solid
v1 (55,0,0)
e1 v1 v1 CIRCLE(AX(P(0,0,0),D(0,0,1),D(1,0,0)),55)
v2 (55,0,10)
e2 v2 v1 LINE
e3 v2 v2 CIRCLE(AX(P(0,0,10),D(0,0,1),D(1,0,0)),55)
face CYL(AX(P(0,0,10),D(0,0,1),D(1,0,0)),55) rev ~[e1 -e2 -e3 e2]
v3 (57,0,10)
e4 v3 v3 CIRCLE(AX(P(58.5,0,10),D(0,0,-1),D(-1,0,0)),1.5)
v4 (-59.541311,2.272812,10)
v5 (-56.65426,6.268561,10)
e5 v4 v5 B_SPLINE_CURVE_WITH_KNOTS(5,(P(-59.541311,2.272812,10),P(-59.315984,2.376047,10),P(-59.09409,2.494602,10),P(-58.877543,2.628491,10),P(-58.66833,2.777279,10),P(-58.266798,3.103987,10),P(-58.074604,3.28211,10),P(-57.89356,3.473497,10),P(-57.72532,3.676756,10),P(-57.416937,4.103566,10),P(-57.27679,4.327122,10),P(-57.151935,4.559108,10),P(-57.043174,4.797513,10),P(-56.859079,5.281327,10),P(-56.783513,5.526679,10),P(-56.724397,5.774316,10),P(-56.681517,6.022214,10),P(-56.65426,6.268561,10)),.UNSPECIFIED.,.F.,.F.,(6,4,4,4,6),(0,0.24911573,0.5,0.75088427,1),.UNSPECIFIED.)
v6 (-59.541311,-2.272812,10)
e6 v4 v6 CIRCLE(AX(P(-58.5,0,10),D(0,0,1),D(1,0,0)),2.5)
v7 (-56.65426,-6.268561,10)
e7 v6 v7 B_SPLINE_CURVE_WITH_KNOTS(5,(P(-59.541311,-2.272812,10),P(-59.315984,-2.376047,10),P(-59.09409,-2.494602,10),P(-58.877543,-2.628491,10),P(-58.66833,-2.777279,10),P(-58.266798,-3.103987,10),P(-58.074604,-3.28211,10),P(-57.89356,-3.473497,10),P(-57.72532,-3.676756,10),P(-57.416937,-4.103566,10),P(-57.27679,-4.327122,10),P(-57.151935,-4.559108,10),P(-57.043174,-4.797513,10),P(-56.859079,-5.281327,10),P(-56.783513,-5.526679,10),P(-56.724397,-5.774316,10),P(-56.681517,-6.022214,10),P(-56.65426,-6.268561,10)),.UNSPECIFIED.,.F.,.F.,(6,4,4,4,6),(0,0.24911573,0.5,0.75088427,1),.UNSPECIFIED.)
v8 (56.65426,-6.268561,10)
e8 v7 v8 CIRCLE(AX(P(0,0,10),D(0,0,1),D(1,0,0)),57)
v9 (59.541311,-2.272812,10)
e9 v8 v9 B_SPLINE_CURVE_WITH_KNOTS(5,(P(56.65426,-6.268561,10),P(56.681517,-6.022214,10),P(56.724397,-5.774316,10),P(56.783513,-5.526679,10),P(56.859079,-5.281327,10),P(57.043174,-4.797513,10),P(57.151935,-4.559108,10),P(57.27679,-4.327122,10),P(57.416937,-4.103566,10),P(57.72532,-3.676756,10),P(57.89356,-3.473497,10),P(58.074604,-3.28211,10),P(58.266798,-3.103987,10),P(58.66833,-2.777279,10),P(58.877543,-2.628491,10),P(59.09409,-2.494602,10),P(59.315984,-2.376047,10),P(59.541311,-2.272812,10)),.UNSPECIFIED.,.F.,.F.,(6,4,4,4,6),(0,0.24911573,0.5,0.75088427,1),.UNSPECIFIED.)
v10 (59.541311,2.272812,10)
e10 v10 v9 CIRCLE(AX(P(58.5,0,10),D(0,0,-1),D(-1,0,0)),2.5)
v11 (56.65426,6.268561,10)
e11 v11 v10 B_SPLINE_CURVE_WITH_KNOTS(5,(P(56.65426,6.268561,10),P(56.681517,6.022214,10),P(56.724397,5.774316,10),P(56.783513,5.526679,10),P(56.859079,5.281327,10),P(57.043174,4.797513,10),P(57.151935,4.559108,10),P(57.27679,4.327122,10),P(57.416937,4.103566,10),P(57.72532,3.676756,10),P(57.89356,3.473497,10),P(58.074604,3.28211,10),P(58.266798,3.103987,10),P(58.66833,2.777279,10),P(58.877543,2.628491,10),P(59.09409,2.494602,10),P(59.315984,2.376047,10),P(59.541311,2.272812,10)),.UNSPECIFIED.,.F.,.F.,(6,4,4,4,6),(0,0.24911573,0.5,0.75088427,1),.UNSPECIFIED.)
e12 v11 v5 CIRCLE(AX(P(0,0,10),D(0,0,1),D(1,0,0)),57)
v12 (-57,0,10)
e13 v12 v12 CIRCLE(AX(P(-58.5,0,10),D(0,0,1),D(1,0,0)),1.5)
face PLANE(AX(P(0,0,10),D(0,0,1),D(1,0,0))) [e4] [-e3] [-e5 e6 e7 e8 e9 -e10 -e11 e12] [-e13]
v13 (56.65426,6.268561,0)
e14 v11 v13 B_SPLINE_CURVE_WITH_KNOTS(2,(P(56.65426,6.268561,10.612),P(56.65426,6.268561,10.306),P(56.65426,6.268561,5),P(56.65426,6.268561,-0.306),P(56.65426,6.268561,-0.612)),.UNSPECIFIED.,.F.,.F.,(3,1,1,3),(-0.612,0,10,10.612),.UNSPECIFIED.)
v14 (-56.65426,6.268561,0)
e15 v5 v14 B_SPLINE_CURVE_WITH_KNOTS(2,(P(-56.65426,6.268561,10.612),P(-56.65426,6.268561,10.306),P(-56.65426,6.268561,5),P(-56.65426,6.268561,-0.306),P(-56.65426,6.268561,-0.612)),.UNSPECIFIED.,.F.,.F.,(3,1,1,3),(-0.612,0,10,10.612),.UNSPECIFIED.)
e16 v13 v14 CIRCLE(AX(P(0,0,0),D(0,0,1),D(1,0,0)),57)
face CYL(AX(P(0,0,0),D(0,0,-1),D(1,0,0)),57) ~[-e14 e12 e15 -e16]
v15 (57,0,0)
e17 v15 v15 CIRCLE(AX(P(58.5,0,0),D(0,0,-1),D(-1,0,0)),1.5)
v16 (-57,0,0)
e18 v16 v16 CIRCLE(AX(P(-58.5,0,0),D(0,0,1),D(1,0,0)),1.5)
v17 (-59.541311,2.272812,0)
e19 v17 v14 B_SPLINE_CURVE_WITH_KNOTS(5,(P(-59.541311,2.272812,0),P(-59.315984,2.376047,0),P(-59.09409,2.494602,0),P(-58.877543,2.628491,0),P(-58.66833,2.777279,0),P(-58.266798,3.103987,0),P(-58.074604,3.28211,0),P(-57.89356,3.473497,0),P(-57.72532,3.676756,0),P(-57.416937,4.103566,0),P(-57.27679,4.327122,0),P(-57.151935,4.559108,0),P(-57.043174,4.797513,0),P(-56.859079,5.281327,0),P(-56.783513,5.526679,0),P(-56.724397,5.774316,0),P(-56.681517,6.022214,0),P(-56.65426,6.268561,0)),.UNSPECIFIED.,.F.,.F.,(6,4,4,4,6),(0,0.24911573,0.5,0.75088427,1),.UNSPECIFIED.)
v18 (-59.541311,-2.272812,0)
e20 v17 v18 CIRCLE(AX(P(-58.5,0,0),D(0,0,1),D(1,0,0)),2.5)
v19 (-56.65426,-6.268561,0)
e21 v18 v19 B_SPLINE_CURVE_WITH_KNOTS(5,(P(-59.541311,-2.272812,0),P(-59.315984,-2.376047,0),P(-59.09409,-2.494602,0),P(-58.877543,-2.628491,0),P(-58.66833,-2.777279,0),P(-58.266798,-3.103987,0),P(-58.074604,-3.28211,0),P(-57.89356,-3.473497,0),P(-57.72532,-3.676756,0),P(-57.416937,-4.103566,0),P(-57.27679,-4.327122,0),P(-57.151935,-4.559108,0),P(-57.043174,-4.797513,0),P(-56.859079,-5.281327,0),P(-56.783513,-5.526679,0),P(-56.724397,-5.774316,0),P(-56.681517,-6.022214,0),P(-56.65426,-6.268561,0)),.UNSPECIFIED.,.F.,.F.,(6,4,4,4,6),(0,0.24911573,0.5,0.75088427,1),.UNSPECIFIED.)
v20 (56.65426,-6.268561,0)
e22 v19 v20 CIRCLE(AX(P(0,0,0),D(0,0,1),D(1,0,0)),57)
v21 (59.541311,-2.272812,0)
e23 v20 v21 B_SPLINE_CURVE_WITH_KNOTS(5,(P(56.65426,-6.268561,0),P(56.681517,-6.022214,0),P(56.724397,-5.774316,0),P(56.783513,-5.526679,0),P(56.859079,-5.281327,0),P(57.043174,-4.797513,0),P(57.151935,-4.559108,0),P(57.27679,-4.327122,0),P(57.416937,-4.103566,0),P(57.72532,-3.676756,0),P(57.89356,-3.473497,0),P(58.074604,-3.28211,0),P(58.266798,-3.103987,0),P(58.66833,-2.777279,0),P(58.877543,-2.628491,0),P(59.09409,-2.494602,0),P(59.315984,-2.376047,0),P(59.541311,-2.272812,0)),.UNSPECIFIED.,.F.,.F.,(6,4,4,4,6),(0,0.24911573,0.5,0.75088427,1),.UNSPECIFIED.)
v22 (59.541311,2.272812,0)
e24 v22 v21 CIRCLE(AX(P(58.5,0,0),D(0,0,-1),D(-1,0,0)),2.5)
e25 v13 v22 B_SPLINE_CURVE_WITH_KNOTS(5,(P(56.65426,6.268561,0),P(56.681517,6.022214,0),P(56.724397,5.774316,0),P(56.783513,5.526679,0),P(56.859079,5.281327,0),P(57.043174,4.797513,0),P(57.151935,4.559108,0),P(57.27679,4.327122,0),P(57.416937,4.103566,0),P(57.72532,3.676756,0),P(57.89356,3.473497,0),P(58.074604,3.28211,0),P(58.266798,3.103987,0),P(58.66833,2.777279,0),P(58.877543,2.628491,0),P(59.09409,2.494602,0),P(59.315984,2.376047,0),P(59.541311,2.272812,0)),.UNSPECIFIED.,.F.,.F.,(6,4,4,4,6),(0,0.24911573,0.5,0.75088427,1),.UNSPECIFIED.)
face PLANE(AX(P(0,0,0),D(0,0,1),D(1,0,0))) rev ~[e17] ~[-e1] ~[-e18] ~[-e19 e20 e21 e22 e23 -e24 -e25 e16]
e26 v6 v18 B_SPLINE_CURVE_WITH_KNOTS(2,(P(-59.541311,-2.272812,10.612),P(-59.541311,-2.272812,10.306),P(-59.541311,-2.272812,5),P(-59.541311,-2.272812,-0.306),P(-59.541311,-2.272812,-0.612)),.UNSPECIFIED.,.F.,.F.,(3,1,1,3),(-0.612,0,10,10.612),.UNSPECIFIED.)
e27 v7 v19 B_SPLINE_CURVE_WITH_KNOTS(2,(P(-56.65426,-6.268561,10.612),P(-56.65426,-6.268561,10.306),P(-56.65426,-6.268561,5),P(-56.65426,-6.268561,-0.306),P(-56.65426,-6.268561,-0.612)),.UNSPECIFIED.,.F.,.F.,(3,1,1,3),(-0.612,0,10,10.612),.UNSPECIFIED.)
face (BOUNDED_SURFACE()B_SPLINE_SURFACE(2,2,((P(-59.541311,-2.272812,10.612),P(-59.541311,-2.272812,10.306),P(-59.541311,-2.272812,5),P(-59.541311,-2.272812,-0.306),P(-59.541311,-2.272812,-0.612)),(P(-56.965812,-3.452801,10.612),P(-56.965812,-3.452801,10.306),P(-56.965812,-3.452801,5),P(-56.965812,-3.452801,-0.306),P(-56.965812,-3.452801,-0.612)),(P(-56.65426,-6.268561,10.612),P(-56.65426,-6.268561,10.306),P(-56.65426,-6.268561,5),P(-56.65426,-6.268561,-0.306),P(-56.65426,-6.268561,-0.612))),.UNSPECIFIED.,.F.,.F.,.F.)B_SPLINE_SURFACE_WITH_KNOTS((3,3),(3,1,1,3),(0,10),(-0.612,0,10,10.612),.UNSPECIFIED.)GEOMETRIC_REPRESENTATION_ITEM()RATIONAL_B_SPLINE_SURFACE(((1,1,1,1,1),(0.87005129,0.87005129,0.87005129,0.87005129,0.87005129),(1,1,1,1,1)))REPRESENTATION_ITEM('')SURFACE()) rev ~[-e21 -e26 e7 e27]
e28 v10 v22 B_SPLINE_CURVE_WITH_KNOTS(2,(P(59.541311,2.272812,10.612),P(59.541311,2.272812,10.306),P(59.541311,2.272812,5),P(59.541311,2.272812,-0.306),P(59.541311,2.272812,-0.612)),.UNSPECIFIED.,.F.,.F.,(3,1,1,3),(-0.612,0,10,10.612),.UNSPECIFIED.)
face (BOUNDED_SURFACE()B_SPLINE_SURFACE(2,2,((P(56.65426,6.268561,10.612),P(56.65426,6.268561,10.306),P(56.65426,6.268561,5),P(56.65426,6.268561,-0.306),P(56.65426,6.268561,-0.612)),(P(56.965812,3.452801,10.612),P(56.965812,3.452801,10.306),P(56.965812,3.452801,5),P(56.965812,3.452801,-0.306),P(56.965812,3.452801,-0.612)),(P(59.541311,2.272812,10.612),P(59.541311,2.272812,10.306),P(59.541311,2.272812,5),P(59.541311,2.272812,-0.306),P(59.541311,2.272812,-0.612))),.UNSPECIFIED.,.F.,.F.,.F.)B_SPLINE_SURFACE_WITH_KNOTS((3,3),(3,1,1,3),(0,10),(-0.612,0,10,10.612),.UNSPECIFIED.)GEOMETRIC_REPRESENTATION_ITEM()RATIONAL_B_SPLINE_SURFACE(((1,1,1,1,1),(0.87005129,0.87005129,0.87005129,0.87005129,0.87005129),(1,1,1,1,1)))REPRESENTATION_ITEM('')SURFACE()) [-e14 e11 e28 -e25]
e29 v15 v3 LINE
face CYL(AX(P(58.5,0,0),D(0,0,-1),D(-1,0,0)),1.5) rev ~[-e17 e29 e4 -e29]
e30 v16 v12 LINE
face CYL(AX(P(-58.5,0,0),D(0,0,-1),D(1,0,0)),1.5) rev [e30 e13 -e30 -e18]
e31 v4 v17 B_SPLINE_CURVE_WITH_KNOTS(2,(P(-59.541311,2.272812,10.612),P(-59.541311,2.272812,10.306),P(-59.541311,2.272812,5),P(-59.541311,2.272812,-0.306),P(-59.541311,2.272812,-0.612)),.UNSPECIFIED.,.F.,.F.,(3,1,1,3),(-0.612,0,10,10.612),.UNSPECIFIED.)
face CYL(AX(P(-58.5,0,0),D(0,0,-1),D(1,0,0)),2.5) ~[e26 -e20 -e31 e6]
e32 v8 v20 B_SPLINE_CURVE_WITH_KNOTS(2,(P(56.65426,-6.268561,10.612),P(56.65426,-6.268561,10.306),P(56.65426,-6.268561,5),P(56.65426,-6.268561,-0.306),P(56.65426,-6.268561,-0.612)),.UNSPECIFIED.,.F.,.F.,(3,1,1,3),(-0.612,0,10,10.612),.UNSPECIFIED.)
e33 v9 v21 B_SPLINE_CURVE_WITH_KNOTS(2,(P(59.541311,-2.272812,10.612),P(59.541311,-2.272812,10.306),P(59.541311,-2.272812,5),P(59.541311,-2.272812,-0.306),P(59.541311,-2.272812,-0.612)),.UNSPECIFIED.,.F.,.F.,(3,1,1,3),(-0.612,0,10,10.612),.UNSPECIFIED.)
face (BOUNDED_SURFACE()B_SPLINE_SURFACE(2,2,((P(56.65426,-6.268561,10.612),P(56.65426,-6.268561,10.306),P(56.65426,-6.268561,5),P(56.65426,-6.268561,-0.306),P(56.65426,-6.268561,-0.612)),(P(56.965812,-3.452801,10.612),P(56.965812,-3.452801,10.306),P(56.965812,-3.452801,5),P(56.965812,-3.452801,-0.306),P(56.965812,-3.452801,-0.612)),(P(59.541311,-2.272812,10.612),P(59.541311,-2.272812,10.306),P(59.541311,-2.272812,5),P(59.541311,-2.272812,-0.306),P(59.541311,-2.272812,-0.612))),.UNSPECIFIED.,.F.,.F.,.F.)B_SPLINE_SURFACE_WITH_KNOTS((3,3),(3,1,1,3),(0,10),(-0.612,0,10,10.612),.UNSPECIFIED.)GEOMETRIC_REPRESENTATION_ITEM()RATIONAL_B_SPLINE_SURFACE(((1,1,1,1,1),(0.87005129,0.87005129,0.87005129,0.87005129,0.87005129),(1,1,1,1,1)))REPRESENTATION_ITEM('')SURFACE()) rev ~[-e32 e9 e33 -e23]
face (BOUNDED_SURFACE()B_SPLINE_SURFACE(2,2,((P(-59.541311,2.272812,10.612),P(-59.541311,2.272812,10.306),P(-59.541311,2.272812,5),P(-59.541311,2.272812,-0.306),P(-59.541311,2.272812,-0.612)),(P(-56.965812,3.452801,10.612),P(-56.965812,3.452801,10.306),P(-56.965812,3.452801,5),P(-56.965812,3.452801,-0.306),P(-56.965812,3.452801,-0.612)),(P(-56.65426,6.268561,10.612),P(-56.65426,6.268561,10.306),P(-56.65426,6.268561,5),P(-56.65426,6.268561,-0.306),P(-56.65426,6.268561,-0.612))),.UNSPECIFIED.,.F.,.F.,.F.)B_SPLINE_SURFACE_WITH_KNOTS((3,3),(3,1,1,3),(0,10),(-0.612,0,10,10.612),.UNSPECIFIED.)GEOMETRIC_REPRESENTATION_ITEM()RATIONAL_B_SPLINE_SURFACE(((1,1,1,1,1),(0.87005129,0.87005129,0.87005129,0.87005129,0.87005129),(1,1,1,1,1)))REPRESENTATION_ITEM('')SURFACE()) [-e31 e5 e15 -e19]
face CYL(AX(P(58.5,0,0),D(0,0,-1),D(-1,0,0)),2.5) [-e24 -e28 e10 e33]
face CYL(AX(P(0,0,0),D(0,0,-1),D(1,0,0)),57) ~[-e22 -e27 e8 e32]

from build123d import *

# Parameters (mm, degrees)
F0_R     = 57
F1_DEPTH = 10
F2_R     = 55
F3_DEPTH = 25
F4_R     = 2.5
F4_R_2   = 1.5
F5_DEPTH = 10
F6_R     = 5


# Not quite as in the source:
# - a pattern or mirror of a feature is missing from the dataset's text; its kind, count and spacing are read off the source's solid


with BuildPart() as f1:
    # F0 (on Top) → F1 (new body)
    with BuildSketch(Plane.XY):
        Circle(F0_R)
    extrude(amount=F1_DEPTH)

    # F2 (on face) → F3 (cut)
    with BuildSketch(Plane.XY.offset(10)):
        Circle(F2_R)
    extrude(amount=-F3_DEPTH, mode=Mode.SUBTRACT)

    # F4 (on Top) → F5 (join)
    with BuildSketch(Plane.XY):
        with Locations((-58.5, 0)):
            Circle(F4_R)
        with Locations((-58.5, 0)):
            Circle(F4_R_2, mode=Mode.SUBTRACT)
    f5 = extrude(amount=F5_DEPTH)

    # F5_copies: F5 across plane
    add(f5.mirror(Plane(origin=(0, 0, 0), x_dir=(0, 0, 1), z_dir=(1, 0, 0))))

    # F6
    f6_edges = [f1.edges().sort_by_distance(p)[0] for p in [
        (-56.965812, 1.973896, 5),
        (-56.965812, -1.973896, 5),
        (56.965812, 1.973896, 5),
        (56.965812, -1.973896, 5),
    ]]
    fillet(f6_edges, radius=F6_R)


solid = f1.part
